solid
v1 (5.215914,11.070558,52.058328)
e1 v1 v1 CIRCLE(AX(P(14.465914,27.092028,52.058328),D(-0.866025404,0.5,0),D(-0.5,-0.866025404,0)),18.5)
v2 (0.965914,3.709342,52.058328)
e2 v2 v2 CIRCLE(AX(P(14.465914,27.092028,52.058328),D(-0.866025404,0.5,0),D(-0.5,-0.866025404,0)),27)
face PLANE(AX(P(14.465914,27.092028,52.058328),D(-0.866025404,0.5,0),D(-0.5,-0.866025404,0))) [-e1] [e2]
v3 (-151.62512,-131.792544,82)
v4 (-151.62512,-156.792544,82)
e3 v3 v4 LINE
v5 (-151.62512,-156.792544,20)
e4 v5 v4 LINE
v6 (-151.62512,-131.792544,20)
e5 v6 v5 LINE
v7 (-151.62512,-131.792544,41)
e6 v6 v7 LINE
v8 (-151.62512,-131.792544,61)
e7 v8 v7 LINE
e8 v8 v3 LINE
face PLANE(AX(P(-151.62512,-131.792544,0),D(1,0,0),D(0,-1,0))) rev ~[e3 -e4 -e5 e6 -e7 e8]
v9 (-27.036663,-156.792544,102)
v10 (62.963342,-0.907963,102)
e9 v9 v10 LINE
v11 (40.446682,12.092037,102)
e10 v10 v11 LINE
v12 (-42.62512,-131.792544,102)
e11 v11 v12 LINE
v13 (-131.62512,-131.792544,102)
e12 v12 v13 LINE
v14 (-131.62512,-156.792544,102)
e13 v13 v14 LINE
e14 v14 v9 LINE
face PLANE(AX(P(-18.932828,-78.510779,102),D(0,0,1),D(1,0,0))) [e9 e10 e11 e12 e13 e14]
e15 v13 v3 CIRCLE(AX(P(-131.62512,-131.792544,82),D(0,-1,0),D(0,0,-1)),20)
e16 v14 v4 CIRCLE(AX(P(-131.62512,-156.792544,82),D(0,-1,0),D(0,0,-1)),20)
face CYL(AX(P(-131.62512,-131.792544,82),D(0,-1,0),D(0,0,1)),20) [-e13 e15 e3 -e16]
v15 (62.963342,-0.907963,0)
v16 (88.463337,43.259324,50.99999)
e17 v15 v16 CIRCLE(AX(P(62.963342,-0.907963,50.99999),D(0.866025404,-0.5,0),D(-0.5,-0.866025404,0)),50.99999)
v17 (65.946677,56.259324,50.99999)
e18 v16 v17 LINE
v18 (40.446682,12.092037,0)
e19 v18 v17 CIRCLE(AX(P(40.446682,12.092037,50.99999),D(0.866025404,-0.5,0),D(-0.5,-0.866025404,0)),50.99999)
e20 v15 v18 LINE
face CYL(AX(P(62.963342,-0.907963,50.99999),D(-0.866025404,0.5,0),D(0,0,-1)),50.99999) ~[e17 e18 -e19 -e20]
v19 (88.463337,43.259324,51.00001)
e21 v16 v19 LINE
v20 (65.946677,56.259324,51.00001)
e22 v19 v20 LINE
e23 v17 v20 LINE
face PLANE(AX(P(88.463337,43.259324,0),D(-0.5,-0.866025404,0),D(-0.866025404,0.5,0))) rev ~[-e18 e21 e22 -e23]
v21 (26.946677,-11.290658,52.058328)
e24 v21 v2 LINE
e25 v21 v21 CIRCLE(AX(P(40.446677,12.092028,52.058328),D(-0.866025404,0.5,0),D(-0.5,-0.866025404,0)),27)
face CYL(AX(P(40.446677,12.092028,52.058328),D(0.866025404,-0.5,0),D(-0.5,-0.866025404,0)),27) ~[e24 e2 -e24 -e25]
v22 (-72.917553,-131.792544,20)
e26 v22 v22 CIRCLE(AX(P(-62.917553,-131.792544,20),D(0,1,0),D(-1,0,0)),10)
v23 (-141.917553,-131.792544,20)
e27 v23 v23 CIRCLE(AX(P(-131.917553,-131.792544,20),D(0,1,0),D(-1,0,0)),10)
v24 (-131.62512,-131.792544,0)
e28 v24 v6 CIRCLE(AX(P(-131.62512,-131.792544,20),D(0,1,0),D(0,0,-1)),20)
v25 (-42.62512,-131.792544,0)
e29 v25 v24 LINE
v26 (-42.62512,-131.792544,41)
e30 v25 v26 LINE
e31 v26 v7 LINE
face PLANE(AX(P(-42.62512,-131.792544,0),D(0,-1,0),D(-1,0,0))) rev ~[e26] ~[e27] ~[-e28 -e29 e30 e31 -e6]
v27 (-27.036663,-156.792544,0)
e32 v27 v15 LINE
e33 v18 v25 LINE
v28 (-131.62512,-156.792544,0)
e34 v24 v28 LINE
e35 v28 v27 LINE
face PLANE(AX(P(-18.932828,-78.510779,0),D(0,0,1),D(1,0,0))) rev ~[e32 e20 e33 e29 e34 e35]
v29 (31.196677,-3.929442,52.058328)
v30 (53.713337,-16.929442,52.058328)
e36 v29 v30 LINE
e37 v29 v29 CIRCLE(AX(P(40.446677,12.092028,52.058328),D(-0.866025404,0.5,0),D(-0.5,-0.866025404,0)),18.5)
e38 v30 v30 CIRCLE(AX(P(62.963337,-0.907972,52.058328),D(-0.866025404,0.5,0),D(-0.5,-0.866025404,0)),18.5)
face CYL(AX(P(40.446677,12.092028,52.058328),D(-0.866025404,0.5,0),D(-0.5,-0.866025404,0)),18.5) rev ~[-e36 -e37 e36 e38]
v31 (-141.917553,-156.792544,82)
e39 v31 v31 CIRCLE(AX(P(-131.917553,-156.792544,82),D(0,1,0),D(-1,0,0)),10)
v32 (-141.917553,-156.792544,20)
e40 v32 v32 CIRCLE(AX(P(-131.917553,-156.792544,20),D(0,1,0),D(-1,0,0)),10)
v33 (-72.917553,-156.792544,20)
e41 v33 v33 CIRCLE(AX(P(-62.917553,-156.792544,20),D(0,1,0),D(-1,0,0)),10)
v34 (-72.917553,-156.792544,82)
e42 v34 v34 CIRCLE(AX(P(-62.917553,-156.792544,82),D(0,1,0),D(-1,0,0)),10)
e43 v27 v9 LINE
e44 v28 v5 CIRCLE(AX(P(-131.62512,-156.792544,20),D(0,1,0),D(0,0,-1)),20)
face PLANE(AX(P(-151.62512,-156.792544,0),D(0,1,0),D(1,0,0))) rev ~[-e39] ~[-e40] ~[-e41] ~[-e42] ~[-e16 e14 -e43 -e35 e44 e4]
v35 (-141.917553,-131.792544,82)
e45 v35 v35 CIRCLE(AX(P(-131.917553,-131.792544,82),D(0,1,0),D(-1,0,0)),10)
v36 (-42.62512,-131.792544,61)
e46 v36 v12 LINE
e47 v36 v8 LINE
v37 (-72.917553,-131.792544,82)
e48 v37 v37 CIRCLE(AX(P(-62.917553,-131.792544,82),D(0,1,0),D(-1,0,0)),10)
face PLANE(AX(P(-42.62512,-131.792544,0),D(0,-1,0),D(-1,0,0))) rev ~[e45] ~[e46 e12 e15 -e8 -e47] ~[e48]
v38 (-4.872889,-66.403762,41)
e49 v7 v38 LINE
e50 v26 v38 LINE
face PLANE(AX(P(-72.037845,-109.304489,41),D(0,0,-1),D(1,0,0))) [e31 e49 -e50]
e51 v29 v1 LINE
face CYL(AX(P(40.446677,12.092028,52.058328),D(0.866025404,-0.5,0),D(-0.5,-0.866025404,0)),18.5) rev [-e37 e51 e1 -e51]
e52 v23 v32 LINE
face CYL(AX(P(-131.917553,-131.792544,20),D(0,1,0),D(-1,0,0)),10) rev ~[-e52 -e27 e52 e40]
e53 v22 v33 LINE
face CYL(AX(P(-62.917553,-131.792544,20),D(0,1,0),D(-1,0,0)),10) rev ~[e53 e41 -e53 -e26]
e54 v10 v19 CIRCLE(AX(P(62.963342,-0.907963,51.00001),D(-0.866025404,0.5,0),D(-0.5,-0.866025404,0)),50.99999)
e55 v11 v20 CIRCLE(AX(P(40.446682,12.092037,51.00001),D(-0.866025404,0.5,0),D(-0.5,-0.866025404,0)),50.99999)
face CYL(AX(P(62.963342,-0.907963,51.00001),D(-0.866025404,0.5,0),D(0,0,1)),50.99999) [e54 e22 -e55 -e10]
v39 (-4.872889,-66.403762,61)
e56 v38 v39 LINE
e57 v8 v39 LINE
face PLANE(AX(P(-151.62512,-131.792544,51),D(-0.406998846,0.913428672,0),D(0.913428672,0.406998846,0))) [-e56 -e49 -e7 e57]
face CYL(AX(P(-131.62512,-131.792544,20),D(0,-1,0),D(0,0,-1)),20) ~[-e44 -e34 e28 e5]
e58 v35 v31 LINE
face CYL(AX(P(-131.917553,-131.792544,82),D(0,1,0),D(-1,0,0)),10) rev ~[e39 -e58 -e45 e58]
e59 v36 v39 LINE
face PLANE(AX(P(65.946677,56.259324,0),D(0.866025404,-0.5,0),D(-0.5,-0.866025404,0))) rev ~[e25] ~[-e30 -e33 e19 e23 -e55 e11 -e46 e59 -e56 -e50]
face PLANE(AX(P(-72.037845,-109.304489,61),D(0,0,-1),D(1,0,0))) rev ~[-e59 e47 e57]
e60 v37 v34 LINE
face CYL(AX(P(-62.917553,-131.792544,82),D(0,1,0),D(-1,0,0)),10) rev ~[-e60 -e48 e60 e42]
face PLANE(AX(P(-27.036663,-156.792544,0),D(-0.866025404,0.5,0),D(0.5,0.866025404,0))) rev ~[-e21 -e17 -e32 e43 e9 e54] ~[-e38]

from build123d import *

# Parameters (mm, degrees)
F1_DEPTH  = 102
F2_R      = 27
F2_R_2    = 18.5
F3_DEPTH  = 30
F4_R      = 10
F5_DEPTH  = 50
F6_R      = 50.99999
F9_DEPTH  = 10
F10_R     = 18.5
F11_DEPTH = 30
F12_R     = 20


# Not quite as in the source:
# - a fillet or chamfer is up to 0.001 mm smaller than in the source, because OpenCascade refuses the exact size


with BuildPart() as f1:
    # F0 (on Top) → F1 (new body)
    with BuildSketch(Plane.XY):
        Polygon((-151.6251202653, -131.7925444834), (-151.6251202653, -156.7925444834), (-27.0366629971, -156.7925444834), (88.4633370029, 43.2593237909), (65.9466765045, 56.2593237909), (-42.6251202653, -131.7925444834), align=None)
    extrude(amount=F1_DEPTH)

    # F2 (on face) → F3 (join)
    with BuildSketch(Plane(origin=(25.099005577, -14.4909176263, 0), x_dir=(-0.5, -0.8660254038, 0), z_dir=(-0.8660254038, 0.5, 0))):
        with Locations((-30.6953418548, 52.0583279431)):
            Circle(F2_R)
        with Locations((-30.6953418548, 52.0583279431)):
            Circle(F2_R_2, mode=Mode.SUBTRACT)
    extrude(amount=F3_DEPTH)

    # F4 (on face) → F5 (cut)
    with BuildSketch(Plane(origin=(0, -131.7925444834, 0), x_dir=(-1, 0, 0), z_dir=(0, 1, 0))):
        with Locations((62.9175528884, 82)):
            Circle(F4_R)
        with Locations((131.9175528884, 82)):
            Circle(F4_R)
        with Locations((131.9175528884, 20)):
            Circle(F4_R)
        with Locations((62.9175528884, 20)):
            Circle(F4_R)
    extrude(amount=-F5_DEPTH, mode=Mode.SUBTRACT)

    # F6 (radius 51 in the source; OpenCascade refuses exactly that, so slightly less here)
    f6_edges = [f1.edges().sort_by_distance(p)[0] for p in [
        (77.205007, 49.759324, 102),
        (77.205007, 49.759324, 0),
    ]]
    fillet(f6_edges, radius=F6_R)

    # F8 (on offset) → F9 (join, symmetric)
    with BuildSketch(Plane(origin=(0, 0, 51), x_dir=(1, 0, 0), z_dir=(0, 0, -1))):
        Polygon((-42.6251202653, 131.7925444834), (-151.6251202653, 131.7925444834), (-4.3144722301, 66.1549466668), align=None)
    extrude(amount=F9_DEPTH, both=True)

    # F10 (on face) → F11 (cut)
    with BuildSketch(Plane(origin=(25.099005577, -14.4909176263, 0), x_dir=(-0.5, -0.8660254038, 0), z_dir=(-0.8660254038, 0.5, 0))):
        with Locations((-30.6953418548, 52.0583279431)):
            Circle(F10_R)
    extrude(amount=-F11_DEPTH, mode=Mode.SUBTRACT)

    # F12
    f12_edges = [f1.edges().sort_by_distance(p)[0] for p in [
        (-151.62512, -144.292544, 102),
        (-151.62512, -144.292544, 0),
    ]]
    fillet(f12_edges, radius=F12_R)


solid = f1.part
